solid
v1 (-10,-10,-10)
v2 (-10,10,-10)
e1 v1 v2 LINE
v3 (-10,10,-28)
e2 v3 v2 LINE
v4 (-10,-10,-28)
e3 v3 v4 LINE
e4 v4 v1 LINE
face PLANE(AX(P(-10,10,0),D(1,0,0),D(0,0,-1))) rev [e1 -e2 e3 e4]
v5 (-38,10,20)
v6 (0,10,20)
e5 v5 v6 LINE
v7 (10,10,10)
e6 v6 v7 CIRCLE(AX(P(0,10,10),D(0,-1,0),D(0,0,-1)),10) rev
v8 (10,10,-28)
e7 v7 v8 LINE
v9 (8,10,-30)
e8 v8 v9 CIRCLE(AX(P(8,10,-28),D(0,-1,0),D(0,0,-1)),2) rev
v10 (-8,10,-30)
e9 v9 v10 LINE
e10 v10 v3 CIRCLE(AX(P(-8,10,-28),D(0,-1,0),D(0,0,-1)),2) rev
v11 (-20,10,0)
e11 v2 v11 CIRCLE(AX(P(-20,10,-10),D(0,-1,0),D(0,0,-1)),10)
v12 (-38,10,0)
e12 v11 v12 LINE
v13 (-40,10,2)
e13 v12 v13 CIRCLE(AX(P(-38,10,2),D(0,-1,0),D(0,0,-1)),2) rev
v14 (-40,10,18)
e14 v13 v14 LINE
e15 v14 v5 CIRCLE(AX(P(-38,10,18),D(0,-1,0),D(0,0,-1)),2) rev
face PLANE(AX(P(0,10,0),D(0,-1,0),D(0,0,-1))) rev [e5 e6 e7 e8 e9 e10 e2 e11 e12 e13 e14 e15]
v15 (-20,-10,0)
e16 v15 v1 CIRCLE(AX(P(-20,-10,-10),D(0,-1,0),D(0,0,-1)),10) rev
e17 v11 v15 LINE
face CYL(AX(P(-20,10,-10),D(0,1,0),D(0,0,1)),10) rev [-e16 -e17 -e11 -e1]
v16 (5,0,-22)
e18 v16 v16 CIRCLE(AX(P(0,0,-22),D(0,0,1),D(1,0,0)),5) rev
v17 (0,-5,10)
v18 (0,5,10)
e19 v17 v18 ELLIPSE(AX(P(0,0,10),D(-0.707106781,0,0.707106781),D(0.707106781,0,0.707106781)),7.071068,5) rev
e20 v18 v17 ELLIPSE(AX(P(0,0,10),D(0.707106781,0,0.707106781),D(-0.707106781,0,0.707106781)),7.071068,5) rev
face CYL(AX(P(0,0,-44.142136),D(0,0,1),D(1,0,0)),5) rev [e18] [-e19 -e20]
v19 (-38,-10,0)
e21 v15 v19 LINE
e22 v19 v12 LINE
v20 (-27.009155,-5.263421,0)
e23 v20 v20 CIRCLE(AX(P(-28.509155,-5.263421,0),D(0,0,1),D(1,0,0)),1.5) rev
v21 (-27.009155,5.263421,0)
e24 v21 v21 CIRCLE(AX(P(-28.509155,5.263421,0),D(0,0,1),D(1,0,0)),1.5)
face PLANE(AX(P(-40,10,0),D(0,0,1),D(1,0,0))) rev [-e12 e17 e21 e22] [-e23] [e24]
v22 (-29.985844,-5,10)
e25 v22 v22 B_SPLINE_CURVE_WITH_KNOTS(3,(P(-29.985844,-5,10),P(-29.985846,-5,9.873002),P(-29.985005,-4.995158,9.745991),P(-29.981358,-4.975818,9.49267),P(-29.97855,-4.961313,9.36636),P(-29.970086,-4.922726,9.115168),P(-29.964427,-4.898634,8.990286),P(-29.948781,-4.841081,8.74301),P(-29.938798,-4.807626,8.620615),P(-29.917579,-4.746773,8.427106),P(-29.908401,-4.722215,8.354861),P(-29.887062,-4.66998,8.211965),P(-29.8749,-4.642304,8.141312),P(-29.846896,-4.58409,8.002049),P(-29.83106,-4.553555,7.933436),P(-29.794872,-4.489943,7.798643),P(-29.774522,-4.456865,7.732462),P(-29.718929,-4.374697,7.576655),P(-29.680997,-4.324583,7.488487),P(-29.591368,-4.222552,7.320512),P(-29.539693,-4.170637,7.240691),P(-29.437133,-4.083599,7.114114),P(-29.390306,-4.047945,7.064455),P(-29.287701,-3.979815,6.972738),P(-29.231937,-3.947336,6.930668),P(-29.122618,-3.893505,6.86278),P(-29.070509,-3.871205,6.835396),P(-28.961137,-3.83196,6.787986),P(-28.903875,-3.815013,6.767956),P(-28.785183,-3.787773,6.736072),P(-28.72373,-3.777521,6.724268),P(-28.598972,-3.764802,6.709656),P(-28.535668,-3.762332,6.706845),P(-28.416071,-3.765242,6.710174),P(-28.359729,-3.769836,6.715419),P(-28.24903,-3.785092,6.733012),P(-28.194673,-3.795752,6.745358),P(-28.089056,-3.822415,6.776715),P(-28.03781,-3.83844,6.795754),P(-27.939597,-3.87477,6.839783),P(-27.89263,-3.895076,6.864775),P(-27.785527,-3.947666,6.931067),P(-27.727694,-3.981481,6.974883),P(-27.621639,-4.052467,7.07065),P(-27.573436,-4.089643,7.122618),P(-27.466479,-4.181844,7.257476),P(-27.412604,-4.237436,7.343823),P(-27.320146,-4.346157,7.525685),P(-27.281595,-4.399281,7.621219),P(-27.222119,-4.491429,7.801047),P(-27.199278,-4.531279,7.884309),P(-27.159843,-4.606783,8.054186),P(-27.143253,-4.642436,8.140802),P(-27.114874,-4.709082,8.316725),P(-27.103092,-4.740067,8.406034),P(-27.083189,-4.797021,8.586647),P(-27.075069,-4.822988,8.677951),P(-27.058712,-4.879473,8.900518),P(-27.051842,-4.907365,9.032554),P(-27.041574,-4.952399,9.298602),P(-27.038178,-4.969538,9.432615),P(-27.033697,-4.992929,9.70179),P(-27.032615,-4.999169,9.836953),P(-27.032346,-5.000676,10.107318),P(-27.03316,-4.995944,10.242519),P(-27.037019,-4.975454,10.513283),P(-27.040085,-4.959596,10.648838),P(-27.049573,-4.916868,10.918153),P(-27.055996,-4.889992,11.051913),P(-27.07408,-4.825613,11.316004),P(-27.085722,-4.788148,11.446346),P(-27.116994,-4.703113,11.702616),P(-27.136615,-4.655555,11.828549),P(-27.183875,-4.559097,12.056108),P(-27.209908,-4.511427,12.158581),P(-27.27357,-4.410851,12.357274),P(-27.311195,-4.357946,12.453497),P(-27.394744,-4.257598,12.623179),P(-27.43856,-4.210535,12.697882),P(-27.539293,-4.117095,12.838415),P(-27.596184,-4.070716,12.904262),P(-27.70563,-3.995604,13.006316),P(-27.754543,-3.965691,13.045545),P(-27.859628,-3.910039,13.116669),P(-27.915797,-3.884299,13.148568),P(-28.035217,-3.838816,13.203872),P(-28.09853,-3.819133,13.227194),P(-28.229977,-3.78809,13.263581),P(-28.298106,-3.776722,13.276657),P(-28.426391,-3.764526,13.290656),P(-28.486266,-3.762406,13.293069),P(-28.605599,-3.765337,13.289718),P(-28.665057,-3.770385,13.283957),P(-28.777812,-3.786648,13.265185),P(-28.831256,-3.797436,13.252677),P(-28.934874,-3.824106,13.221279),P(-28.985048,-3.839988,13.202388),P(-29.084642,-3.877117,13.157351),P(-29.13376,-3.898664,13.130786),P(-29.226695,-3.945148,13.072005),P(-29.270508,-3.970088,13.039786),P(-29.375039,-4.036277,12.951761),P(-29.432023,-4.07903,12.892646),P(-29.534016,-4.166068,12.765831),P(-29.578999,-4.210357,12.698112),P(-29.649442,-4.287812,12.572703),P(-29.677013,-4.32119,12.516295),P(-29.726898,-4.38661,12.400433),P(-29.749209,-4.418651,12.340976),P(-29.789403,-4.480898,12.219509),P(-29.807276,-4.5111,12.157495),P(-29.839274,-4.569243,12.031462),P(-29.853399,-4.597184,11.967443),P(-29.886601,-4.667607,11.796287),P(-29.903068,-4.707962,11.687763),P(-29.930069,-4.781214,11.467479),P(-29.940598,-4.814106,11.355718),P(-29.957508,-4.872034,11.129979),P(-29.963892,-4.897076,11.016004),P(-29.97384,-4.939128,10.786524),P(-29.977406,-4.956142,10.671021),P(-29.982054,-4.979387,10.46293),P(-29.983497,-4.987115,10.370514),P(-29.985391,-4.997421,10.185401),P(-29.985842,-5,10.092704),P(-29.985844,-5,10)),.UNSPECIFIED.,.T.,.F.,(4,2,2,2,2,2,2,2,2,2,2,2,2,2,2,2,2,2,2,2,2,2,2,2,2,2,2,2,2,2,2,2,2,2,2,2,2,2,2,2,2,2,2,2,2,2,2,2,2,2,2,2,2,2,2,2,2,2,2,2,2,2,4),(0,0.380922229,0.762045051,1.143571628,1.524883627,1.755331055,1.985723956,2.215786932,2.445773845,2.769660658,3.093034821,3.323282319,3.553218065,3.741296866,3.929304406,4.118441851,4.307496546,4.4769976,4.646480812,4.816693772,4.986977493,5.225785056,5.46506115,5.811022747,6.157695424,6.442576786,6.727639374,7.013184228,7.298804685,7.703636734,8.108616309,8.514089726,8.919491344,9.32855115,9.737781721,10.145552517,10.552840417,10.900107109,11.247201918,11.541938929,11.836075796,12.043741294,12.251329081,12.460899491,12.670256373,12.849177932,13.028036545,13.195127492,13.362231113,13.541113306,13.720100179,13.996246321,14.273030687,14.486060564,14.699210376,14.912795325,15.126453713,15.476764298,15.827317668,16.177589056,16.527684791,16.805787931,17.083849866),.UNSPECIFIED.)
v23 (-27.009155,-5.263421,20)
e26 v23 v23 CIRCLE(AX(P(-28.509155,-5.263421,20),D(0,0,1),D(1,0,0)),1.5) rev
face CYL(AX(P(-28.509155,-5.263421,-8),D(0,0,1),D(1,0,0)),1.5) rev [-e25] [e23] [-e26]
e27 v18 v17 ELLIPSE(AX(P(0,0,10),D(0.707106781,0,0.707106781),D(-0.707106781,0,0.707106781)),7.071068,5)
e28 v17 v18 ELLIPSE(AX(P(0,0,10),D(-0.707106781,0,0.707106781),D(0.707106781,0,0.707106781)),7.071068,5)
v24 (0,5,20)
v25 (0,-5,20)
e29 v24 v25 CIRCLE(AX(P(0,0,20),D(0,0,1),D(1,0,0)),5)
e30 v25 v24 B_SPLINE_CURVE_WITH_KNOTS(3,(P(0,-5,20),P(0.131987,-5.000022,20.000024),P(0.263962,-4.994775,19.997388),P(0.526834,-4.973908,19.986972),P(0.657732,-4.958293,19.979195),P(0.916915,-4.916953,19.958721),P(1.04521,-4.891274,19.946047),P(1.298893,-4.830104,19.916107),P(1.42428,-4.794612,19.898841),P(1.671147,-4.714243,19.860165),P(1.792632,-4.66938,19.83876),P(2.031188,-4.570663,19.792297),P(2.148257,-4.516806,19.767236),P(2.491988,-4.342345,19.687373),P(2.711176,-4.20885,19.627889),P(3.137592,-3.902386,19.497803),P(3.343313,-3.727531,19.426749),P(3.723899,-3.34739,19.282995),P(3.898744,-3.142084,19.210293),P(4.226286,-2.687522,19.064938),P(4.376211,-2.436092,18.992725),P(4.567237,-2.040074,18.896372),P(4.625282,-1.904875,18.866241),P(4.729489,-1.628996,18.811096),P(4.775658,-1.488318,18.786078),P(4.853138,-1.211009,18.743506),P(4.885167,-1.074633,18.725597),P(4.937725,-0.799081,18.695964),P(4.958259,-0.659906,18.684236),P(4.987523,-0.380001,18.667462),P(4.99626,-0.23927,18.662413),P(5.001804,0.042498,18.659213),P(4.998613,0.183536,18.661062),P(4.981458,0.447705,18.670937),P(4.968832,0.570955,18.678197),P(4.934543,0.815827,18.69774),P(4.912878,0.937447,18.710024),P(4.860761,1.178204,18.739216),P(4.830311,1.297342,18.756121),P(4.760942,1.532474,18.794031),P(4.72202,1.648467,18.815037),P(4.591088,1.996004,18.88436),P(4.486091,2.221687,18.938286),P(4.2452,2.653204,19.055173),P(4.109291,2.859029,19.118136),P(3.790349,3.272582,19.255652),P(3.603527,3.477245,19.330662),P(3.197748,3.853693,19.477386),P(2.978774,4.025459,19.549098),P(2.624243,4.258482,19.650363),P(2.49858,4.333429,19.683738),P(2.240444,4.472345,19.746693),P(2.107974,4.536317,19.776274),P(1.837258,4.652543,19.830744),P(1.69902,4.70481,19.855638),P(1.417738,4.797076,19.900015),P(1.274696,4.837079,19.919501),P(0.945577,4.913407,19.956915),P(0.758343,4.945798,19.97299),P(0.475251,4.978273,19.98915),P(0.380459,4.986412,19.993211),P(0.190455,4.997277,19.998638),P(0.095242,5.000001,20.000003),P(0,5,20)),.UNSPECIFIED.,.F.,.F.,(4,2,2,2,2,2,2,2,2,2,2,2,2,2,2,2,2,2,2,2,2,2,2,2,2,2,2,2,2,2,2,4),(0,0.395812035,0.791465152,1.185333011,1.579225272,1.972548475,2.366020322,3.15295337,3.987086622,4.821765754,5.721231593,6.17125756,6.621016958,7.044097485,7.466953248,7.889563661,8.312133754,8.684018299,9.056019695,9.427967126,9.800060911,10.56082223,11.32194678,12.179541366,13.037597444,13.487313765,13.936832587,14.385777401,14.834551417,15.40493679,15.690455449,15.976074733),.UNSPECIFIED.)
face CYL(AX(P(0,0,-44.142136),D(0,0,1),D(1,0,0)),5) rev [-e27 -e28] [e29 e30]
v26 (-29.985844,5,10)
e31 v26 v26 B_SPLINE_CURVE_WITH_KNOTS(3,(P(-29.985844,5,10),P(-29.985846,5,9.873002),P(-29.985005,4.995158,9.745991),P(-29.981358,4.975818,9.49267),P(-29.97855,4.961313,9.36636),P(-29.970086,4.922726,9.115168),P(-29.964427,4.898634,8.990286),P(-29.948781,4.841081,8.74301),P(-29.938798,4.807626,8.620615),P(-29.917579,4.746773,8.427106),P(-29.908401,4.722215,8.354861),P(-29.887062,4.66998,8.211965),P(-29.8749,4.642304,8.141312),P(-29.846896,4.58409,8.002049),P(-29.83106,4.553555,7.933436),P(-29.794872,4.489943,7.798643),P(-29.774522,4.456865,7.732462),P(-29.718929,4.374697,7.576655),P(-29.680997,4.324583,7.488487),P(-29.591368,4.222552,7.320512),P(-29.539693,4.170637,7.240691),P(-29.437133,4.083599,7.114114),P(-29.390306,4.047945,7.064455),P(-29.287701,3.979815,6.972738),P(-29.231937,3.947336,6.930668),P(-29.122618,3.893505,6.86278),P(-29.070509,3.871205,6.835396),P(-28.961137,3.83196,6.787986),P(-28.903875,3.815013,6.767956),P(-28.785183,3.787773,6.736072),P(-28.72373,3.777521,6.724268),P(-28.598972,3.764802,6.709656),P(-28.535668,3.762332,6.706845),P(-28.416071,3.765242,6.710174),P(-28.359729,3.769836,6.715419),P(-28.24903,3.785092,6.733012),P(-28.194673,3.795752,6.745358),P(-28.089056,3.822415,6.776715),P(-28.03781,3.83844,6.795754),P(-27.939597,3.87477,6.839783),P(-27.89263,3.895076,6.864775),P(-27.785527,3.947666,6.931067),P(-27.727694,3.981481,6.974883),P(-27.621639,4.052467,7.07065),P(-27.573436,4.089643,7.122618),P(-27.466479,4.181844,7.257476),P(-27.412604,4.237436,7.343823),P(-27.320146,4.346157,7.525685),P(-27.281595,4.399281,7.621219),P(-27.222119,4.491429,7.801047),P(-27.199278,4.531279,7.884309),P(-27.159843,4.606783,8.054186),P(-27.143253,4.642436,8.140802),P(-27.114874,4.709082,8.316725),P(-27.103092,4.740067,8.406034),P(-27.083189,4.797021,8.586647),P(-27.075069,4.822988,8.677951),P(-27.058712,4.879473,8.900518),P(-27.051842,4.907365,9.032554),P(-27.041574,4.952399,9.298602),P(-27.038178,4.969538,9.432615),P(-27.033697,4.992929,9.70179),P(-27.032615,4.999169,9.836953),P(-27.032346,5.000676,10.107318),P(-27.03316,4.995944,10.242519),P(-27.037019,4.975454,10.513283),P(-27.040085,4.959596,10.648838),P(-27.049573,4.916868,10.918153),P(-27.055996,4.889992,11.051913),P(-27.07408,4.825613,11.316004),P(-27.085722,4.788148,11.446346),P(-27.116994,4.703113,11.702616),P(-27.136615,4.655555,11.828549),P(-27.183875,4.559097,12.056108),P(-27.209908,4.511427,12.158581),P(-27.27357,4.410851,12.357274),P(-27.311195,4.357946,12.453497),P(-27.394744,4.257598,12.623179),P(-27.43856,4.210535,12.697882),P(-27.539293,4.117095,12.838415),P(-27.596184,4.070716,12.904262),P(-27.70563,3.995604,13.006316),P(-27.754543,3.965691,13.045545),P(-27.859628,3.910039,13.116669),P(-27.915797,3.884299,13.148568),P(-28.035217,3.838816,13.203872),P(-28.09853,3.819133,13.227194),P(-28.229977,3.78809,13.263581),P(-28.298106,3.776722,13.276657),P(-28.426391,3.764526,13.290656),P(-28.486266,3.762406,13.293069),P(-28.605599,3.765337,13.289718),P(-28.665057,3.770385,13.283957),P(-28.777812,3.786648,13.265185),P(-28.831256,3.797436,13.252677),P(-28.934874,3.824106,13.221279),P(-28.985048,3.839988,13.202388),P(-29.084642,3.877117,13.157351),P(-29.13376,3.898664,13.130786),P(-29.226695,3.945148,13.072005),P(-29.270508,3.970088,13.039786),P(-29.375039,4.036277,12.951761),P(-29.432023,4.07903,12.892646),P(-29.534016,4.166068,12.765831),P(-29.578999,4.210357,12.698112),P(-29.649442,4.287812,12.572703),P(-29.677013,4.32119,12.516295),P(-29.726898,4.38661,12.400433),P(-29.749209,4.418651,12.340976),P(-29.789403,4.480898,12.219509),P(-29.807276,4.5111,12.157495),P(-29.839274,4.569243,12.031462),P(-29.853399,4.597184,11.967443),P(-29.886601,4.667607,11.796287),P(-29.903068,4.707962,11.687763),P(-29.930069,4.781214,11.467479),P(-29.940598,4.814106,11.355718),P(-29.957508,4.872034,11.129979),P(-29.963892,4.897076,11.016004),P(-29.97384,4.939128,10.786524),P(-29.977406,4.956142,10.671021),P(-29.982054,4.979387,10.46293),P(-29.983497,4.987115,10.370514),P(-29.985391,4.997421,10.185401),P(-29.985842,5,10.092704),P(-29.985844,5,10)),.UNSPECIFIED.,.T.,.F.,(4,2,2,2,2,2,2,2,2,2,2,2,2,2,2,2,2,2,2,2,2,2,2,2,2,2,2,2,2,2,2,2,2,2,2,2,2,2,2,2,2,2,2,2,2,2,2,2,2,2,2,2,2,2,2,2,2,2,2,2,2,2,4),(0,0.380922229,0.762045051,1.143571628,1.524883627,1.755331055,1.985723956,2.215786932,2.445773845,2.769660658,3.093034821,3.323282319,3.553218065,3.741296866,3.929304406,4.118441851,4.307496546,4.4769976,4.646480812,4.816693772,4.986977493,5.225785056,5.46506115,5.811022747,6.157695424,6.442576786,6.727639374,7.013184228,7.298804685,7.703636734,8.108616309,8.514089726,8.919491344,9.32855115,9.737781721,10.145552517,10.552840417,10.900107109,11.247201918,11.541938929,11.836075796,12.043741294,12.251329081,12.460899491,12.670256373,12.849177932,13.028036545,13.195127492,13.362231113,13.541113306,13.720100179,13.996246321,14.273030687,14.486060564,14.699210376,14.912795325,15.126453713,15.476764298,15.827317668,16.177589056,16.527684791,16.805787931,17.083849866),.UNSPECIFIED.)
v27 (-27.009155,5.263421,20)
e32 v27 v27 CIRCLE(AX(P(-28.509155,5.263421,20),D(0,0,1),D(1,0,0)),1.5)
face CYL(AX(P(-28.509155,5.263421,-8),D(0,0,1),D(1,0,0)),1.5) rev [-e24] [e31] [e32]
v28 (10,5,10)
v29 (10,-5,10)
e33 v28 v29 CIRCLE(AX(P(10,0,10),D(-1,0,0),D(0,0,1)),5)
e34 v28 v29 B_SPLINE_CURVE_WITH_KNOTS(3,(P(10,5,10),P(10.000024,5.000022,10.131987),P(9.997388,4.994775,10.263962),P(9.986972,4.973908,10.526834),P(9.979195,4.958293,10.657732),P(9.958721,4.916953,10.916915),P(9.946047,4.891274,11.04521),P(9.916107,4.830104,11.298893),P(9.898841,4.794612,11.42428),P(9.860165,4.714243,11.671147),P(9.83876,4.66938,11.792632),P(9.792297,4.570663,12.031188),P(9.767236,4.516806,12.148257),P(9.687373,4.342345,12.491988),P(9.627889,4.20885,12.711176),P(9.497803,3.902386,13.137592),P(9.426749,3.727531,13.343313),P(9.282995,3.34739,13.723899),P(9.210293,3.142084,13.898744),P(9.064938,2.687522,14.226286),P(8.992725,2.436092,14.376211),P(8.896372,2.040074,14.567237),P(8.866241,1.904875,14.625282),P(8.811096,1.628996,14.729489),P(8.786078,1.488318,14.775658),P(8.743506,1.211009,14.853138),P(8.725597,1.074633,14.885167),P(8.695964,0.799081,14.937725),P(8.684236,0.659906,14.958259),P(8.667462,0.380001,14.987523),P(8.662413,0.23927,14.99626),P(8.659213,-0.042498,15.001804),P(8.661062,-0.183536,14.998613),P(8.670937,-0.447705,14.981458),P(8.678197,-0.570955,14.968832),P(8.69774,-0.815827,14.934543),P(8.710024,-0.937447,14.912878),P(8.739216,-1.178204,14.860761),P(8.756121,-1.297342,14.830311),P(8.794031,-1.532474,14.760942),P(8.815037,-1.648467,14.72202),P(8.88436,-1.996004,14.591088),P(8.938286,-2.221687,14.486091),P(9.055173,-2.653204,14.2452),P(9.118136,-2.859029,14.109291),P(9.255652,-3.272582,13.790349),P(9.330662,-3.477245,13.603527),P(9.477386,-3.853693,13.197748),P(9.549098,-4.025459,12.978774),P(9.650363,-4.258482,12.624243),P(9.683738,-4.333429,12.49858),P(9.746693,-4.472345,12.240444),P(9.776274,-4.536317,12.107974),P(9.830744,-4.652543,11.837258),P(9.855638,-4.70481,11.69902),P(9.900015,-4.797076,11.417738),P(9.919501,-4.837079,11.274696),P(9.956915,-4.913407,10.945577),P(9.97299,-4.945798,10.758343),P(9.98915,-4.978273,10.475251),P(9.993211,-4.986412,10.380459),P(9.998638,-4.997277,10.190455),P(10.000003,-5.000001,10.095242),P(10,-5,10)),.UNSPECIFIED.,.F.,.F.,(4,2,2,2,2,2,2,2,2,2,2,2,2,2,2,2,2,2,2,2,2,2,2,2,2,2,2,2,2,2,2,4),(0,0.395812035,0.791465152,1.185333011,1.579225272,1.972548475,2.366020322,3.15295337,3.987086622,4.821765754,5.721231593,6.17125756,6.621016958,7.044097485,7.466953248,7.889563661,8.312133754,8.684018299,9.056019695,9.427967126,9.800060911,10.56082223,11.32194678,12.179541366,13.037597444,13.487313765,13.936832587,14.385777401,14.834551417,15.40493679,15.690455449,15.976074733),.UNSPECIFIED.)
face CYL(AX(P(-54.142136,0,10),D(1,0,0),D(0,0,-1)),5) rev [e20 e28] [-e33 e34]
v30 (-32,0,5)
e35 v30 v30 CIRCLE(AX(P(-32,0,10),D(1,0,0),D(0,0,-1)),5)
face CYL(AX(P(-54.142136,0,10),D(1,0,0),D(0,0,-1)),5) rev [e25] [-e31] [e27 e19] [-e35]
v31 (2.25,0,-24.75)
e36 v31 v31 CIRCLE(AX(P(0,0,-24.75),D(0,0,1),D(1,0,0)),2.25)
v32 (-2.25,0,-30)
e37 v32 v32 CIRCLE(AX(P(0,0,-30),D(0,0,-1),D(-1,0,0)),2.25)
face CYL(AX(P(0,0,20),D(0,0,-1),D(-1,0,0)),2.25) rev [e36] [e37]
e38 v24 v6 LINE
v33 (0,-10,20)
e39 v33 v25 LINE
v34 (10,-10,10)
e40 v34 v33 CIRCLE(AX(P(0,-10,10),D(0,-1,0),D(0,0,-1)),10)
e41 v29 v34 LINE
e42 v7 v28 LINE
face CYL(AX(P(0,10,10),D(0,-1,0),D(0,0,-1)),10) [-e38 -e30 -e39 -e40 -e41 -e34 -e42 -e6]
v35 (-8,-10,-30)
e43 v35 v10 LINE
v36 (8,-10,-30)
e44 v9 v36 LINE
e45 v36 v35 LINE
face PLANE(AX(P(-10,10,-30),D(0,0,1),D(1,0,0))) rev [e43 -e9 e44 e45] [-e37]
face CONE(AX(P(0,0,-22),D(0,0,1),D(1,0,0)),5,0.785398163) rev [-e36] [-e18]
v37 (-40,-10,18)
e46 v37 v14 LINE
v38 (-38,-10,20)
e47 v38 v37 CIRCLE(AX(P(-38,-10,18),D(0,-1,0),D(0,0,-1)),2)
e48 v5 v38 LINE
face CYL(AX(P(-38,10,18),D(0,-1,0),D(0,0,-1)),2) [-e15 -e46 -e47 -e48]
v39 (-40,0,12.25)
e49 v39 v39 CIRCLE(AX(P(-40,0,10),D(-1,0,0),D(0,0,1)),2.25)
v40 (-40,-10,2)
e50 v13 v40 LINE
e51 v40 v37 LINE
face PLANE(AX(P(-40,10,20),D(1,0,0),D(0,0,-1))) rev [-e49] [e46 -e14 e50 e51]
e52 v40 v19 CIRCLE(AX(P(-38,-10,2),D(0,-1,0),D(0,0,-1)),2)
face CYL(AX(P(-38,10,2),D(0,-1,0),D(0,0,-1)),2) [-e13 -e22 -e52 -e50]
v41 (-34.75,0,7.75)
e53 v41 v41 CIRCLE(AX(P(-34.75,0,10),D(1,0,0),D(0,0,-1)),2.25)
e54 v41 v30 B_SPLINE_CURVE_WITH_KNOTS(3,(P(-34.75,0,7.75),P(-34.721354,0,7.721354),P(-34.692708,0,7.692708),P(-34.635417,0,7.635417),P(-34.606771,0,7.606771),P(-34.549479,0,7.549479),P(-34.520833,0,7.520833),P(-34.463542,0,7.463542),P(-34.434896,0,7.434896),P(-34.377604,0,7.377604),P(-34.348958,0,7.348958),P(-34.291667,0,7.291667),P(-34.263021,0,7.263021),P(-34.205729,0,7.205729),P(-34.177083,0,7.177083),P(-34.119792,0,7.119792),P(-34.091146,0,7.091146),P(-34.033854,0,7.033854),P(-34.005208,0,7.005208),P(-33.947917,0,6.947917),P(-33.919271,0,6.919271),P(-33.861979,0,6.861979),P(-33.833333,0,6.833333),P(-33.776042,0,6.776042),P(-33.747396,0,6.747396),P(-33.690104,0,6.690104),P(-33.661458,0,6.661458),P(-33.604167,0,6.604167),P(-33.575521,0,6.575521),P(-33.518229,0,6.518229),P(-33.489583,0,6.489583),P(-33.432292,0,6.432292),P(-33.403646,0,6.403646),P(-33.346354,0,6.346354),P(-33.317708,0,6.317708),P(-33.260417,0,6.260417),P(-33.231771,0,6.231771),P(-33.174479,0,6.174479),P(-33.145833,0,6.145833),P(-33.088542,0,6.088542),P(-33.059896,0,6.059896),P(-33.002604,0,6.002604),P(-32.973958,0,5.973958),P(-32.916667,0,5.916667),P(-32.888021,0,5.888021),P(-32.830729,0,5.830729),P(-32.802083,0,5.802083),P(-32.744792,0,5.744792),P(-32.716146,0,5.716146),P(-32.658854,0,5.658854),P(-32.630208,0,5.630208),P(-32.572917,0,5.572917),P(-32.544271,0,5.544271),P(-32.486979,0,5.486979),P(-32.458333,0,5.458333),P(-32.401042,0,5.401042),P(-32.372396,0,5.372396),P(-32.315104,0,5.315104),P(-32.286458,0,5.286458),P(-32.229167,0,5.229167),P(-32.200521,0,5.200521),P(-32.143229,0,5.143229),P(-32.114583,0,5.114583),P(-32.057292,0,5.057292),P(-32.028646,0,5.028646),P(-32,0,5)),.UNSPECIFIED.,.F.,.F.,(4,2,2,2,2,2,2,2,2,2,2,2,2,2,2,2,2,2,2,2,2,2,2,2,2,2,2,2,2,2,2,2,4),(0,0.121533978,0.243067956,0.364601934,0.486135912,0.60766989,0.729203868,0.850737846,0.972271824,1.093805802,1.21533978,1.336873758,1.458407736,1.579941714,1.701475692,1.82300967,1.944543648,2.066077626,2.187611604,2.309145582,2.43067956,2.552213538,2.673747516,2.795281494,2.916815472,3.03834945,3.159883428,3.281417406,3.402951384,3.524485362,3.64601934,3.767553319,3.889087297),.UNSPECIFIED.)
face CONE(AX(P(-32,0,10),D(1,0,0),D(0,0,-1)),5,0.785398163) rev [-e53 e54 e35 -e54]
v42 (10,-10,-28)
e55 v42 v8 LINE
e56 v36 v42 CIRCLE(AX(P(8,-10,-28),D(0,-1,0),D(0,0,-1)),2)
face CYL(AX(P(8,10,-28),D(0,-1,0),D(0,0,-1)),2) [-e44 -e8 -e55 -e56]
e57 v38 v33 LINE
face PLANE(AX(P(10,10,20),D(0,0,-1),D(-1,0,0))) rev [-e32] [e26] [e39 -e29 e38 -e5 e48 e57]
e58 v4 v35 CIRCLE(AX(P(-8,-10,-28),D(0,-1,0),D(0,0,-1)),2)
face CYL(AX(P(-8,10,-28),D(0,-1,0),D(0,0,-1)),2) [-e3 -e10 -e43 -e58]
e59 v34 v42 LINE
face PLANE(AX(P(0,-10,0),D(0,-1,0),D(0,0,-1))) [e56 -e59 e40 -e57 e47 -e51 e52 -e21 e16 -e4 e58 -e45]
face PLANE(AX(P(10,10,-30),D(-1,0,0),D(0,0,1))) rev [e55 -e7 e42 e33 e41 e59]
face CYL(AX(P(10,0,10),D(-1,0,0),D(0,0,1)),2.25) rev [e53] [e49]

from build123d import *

# Parameters (mm, degrees)
BOSS_EXTRUDE1_DEPTH = 10
SKETCH2_R           = 2.25
CUT_EXTRUDE1_DEPTH  = 65.807406984
SKETCH3_R           = 2.25
CUT_EXTRUDE2_DEPTH  = 60.160797831
SKETCH5_R           = 5
CUT_EXTRUDE3_DEPTH  = 42
SKETCH6_R           = 5
CUT_EXTRUDE4_DEPTH  = 42
CHAMFER1_SIZE       = 2.75
FILLET1_R           = 10
FILLET2_R           = 2
SKETCH8_R           = 1.5
CUT_EXTRUDE5_DEPTH  = 28


# Some blends are built 0.0001 mm under size
with BuildPart() as part:
    # Sketch1 → Boss-Extrude1 (new, symmetric)
    with BuildSketch(Plane(origin=(0, 0, 0), x_dir=(1, 0, 0), z_dir=(0, 1, 0))):
        Polygon((-10, 30), (10, 30), (10, -20), (-40, -20), (-40, 0), (-10, 0), align=None)
    extrude(amount=BOSS_EXTRUDE1_DEPTH, both=True)

    # Sketch2 → Cut-Extrude1 (cut, through all)
    with BuildSketch(Plane(origin=(0, 0, -30), x_dir=(-1, 0, 0), z_dir=(0, 0, -1))):
        Circle(SKETCH2_R)
    extrude(amount=-CUT_EXTRUDE1_DEPTH, mode=Mode.SUBTRACT)

    # Sketch3 → Cut-Extrude2 (cut, through all)
    with BuildSketch(Plane.ZY.offset(40)):
        with Locations((10, 0)):
            Circle(SKETCH3_R)
    extrude(amount=-CUT_EXTRUDE2_DEPTH, mode=Mode.SUBTRACT)

    # Sketch5 → Cut-Extrude3 (cut)
    with BuildSketch(Plane.XY.offset(20)):
        Circle(SKETCH5_R)
    extrude(amount=-CUT_EXTRUDE3_DEPTH, mode=Mode.SUBTRACT)

    # Sketch6 → Cut-Extrude4 (cut)
    with BuildSketch(Plane.ZY.offset(-10)):
        with Locations(Location((10, 0, 0), (0, 0, 180))):
            Circle(SKETCH6_R)
    extrude(amount=CUT_EXTRUDE4_DEPTH, mode=Mode.SUBTRACT)

    # Chamfer1
    chamfer1_edges = [part.edges().sort_by_distance(p)[0] for p in [
        (2.25, 0, -22),
        (-32, 0, 7.75),
    ]]
    chamfer(chamfer1_edges, length=CHAMFER1_SIZE - 0.0001)  # a hair under: the kernel refuses the full size

    # Fillet1
    # the kernel refuses this fillet: 10 mm, written as the material it adds along each edge
    with BuildSketch(Plane(origin=(-10, -10, 0), x_dir=(0, 0, -1), z_dir=(0, 1, 0))) as fillet1_piece_1:
        with BuildLine():
            CenterArc((FILLET1_R, FILLET1_R), FILLET1_R, 180, 90)
            Line((0, FILLET1_R), (0, 0))
            Line((0, 0), (FILLET1_R, 0))
        make_face()
    extrude(amount=20)
    # the kernel refuses this fillet: 10 mm, written as the material it takes off along each edge
    with BuildSketch(Plane(origin=(10, 35, 20), x_dir=(0, 0, -1), z_dir=(0, -1, 0))) as fillet1_2_piece_1:
        with BuildLine():
            CenterArc((FILLET1_R, -FILLET1_R), FILLET1_R, 90, 90)
            Line((0, -FILLET1_R), (0, 0))
            Line((0, 0), (FILLET1_R, 0))
        make_face()
    extrude(amount=70, mode=Mode.SUBTRACT)

    # Fillet2
    fillet2_edges = [part.edges().sort_by_distance(p)[0] for p in [
        (-10, 0, -30),
        (10, 0, -30),
        (-40, 0, 20),
        (-40, 0, 0),
    ]]
    fillet(fillet2_edges, radius=FILLET2_R)

    # Sketch8 → Cut-Extrude5 (cut)
    with BuildSketch(Plane.XY.offset(20)):
        with Locations((-28.509155223, 5.263420724)):
            Circle(SKETCH8_R)
        with Locations((-28.509155223, -5.263420724)):
            Circle(SKETCH8_R)
    extrude(amount=-CUT_EXTRUDE5_DEPTH, mode=Mode.SUBTRACT)


solid = part.part
